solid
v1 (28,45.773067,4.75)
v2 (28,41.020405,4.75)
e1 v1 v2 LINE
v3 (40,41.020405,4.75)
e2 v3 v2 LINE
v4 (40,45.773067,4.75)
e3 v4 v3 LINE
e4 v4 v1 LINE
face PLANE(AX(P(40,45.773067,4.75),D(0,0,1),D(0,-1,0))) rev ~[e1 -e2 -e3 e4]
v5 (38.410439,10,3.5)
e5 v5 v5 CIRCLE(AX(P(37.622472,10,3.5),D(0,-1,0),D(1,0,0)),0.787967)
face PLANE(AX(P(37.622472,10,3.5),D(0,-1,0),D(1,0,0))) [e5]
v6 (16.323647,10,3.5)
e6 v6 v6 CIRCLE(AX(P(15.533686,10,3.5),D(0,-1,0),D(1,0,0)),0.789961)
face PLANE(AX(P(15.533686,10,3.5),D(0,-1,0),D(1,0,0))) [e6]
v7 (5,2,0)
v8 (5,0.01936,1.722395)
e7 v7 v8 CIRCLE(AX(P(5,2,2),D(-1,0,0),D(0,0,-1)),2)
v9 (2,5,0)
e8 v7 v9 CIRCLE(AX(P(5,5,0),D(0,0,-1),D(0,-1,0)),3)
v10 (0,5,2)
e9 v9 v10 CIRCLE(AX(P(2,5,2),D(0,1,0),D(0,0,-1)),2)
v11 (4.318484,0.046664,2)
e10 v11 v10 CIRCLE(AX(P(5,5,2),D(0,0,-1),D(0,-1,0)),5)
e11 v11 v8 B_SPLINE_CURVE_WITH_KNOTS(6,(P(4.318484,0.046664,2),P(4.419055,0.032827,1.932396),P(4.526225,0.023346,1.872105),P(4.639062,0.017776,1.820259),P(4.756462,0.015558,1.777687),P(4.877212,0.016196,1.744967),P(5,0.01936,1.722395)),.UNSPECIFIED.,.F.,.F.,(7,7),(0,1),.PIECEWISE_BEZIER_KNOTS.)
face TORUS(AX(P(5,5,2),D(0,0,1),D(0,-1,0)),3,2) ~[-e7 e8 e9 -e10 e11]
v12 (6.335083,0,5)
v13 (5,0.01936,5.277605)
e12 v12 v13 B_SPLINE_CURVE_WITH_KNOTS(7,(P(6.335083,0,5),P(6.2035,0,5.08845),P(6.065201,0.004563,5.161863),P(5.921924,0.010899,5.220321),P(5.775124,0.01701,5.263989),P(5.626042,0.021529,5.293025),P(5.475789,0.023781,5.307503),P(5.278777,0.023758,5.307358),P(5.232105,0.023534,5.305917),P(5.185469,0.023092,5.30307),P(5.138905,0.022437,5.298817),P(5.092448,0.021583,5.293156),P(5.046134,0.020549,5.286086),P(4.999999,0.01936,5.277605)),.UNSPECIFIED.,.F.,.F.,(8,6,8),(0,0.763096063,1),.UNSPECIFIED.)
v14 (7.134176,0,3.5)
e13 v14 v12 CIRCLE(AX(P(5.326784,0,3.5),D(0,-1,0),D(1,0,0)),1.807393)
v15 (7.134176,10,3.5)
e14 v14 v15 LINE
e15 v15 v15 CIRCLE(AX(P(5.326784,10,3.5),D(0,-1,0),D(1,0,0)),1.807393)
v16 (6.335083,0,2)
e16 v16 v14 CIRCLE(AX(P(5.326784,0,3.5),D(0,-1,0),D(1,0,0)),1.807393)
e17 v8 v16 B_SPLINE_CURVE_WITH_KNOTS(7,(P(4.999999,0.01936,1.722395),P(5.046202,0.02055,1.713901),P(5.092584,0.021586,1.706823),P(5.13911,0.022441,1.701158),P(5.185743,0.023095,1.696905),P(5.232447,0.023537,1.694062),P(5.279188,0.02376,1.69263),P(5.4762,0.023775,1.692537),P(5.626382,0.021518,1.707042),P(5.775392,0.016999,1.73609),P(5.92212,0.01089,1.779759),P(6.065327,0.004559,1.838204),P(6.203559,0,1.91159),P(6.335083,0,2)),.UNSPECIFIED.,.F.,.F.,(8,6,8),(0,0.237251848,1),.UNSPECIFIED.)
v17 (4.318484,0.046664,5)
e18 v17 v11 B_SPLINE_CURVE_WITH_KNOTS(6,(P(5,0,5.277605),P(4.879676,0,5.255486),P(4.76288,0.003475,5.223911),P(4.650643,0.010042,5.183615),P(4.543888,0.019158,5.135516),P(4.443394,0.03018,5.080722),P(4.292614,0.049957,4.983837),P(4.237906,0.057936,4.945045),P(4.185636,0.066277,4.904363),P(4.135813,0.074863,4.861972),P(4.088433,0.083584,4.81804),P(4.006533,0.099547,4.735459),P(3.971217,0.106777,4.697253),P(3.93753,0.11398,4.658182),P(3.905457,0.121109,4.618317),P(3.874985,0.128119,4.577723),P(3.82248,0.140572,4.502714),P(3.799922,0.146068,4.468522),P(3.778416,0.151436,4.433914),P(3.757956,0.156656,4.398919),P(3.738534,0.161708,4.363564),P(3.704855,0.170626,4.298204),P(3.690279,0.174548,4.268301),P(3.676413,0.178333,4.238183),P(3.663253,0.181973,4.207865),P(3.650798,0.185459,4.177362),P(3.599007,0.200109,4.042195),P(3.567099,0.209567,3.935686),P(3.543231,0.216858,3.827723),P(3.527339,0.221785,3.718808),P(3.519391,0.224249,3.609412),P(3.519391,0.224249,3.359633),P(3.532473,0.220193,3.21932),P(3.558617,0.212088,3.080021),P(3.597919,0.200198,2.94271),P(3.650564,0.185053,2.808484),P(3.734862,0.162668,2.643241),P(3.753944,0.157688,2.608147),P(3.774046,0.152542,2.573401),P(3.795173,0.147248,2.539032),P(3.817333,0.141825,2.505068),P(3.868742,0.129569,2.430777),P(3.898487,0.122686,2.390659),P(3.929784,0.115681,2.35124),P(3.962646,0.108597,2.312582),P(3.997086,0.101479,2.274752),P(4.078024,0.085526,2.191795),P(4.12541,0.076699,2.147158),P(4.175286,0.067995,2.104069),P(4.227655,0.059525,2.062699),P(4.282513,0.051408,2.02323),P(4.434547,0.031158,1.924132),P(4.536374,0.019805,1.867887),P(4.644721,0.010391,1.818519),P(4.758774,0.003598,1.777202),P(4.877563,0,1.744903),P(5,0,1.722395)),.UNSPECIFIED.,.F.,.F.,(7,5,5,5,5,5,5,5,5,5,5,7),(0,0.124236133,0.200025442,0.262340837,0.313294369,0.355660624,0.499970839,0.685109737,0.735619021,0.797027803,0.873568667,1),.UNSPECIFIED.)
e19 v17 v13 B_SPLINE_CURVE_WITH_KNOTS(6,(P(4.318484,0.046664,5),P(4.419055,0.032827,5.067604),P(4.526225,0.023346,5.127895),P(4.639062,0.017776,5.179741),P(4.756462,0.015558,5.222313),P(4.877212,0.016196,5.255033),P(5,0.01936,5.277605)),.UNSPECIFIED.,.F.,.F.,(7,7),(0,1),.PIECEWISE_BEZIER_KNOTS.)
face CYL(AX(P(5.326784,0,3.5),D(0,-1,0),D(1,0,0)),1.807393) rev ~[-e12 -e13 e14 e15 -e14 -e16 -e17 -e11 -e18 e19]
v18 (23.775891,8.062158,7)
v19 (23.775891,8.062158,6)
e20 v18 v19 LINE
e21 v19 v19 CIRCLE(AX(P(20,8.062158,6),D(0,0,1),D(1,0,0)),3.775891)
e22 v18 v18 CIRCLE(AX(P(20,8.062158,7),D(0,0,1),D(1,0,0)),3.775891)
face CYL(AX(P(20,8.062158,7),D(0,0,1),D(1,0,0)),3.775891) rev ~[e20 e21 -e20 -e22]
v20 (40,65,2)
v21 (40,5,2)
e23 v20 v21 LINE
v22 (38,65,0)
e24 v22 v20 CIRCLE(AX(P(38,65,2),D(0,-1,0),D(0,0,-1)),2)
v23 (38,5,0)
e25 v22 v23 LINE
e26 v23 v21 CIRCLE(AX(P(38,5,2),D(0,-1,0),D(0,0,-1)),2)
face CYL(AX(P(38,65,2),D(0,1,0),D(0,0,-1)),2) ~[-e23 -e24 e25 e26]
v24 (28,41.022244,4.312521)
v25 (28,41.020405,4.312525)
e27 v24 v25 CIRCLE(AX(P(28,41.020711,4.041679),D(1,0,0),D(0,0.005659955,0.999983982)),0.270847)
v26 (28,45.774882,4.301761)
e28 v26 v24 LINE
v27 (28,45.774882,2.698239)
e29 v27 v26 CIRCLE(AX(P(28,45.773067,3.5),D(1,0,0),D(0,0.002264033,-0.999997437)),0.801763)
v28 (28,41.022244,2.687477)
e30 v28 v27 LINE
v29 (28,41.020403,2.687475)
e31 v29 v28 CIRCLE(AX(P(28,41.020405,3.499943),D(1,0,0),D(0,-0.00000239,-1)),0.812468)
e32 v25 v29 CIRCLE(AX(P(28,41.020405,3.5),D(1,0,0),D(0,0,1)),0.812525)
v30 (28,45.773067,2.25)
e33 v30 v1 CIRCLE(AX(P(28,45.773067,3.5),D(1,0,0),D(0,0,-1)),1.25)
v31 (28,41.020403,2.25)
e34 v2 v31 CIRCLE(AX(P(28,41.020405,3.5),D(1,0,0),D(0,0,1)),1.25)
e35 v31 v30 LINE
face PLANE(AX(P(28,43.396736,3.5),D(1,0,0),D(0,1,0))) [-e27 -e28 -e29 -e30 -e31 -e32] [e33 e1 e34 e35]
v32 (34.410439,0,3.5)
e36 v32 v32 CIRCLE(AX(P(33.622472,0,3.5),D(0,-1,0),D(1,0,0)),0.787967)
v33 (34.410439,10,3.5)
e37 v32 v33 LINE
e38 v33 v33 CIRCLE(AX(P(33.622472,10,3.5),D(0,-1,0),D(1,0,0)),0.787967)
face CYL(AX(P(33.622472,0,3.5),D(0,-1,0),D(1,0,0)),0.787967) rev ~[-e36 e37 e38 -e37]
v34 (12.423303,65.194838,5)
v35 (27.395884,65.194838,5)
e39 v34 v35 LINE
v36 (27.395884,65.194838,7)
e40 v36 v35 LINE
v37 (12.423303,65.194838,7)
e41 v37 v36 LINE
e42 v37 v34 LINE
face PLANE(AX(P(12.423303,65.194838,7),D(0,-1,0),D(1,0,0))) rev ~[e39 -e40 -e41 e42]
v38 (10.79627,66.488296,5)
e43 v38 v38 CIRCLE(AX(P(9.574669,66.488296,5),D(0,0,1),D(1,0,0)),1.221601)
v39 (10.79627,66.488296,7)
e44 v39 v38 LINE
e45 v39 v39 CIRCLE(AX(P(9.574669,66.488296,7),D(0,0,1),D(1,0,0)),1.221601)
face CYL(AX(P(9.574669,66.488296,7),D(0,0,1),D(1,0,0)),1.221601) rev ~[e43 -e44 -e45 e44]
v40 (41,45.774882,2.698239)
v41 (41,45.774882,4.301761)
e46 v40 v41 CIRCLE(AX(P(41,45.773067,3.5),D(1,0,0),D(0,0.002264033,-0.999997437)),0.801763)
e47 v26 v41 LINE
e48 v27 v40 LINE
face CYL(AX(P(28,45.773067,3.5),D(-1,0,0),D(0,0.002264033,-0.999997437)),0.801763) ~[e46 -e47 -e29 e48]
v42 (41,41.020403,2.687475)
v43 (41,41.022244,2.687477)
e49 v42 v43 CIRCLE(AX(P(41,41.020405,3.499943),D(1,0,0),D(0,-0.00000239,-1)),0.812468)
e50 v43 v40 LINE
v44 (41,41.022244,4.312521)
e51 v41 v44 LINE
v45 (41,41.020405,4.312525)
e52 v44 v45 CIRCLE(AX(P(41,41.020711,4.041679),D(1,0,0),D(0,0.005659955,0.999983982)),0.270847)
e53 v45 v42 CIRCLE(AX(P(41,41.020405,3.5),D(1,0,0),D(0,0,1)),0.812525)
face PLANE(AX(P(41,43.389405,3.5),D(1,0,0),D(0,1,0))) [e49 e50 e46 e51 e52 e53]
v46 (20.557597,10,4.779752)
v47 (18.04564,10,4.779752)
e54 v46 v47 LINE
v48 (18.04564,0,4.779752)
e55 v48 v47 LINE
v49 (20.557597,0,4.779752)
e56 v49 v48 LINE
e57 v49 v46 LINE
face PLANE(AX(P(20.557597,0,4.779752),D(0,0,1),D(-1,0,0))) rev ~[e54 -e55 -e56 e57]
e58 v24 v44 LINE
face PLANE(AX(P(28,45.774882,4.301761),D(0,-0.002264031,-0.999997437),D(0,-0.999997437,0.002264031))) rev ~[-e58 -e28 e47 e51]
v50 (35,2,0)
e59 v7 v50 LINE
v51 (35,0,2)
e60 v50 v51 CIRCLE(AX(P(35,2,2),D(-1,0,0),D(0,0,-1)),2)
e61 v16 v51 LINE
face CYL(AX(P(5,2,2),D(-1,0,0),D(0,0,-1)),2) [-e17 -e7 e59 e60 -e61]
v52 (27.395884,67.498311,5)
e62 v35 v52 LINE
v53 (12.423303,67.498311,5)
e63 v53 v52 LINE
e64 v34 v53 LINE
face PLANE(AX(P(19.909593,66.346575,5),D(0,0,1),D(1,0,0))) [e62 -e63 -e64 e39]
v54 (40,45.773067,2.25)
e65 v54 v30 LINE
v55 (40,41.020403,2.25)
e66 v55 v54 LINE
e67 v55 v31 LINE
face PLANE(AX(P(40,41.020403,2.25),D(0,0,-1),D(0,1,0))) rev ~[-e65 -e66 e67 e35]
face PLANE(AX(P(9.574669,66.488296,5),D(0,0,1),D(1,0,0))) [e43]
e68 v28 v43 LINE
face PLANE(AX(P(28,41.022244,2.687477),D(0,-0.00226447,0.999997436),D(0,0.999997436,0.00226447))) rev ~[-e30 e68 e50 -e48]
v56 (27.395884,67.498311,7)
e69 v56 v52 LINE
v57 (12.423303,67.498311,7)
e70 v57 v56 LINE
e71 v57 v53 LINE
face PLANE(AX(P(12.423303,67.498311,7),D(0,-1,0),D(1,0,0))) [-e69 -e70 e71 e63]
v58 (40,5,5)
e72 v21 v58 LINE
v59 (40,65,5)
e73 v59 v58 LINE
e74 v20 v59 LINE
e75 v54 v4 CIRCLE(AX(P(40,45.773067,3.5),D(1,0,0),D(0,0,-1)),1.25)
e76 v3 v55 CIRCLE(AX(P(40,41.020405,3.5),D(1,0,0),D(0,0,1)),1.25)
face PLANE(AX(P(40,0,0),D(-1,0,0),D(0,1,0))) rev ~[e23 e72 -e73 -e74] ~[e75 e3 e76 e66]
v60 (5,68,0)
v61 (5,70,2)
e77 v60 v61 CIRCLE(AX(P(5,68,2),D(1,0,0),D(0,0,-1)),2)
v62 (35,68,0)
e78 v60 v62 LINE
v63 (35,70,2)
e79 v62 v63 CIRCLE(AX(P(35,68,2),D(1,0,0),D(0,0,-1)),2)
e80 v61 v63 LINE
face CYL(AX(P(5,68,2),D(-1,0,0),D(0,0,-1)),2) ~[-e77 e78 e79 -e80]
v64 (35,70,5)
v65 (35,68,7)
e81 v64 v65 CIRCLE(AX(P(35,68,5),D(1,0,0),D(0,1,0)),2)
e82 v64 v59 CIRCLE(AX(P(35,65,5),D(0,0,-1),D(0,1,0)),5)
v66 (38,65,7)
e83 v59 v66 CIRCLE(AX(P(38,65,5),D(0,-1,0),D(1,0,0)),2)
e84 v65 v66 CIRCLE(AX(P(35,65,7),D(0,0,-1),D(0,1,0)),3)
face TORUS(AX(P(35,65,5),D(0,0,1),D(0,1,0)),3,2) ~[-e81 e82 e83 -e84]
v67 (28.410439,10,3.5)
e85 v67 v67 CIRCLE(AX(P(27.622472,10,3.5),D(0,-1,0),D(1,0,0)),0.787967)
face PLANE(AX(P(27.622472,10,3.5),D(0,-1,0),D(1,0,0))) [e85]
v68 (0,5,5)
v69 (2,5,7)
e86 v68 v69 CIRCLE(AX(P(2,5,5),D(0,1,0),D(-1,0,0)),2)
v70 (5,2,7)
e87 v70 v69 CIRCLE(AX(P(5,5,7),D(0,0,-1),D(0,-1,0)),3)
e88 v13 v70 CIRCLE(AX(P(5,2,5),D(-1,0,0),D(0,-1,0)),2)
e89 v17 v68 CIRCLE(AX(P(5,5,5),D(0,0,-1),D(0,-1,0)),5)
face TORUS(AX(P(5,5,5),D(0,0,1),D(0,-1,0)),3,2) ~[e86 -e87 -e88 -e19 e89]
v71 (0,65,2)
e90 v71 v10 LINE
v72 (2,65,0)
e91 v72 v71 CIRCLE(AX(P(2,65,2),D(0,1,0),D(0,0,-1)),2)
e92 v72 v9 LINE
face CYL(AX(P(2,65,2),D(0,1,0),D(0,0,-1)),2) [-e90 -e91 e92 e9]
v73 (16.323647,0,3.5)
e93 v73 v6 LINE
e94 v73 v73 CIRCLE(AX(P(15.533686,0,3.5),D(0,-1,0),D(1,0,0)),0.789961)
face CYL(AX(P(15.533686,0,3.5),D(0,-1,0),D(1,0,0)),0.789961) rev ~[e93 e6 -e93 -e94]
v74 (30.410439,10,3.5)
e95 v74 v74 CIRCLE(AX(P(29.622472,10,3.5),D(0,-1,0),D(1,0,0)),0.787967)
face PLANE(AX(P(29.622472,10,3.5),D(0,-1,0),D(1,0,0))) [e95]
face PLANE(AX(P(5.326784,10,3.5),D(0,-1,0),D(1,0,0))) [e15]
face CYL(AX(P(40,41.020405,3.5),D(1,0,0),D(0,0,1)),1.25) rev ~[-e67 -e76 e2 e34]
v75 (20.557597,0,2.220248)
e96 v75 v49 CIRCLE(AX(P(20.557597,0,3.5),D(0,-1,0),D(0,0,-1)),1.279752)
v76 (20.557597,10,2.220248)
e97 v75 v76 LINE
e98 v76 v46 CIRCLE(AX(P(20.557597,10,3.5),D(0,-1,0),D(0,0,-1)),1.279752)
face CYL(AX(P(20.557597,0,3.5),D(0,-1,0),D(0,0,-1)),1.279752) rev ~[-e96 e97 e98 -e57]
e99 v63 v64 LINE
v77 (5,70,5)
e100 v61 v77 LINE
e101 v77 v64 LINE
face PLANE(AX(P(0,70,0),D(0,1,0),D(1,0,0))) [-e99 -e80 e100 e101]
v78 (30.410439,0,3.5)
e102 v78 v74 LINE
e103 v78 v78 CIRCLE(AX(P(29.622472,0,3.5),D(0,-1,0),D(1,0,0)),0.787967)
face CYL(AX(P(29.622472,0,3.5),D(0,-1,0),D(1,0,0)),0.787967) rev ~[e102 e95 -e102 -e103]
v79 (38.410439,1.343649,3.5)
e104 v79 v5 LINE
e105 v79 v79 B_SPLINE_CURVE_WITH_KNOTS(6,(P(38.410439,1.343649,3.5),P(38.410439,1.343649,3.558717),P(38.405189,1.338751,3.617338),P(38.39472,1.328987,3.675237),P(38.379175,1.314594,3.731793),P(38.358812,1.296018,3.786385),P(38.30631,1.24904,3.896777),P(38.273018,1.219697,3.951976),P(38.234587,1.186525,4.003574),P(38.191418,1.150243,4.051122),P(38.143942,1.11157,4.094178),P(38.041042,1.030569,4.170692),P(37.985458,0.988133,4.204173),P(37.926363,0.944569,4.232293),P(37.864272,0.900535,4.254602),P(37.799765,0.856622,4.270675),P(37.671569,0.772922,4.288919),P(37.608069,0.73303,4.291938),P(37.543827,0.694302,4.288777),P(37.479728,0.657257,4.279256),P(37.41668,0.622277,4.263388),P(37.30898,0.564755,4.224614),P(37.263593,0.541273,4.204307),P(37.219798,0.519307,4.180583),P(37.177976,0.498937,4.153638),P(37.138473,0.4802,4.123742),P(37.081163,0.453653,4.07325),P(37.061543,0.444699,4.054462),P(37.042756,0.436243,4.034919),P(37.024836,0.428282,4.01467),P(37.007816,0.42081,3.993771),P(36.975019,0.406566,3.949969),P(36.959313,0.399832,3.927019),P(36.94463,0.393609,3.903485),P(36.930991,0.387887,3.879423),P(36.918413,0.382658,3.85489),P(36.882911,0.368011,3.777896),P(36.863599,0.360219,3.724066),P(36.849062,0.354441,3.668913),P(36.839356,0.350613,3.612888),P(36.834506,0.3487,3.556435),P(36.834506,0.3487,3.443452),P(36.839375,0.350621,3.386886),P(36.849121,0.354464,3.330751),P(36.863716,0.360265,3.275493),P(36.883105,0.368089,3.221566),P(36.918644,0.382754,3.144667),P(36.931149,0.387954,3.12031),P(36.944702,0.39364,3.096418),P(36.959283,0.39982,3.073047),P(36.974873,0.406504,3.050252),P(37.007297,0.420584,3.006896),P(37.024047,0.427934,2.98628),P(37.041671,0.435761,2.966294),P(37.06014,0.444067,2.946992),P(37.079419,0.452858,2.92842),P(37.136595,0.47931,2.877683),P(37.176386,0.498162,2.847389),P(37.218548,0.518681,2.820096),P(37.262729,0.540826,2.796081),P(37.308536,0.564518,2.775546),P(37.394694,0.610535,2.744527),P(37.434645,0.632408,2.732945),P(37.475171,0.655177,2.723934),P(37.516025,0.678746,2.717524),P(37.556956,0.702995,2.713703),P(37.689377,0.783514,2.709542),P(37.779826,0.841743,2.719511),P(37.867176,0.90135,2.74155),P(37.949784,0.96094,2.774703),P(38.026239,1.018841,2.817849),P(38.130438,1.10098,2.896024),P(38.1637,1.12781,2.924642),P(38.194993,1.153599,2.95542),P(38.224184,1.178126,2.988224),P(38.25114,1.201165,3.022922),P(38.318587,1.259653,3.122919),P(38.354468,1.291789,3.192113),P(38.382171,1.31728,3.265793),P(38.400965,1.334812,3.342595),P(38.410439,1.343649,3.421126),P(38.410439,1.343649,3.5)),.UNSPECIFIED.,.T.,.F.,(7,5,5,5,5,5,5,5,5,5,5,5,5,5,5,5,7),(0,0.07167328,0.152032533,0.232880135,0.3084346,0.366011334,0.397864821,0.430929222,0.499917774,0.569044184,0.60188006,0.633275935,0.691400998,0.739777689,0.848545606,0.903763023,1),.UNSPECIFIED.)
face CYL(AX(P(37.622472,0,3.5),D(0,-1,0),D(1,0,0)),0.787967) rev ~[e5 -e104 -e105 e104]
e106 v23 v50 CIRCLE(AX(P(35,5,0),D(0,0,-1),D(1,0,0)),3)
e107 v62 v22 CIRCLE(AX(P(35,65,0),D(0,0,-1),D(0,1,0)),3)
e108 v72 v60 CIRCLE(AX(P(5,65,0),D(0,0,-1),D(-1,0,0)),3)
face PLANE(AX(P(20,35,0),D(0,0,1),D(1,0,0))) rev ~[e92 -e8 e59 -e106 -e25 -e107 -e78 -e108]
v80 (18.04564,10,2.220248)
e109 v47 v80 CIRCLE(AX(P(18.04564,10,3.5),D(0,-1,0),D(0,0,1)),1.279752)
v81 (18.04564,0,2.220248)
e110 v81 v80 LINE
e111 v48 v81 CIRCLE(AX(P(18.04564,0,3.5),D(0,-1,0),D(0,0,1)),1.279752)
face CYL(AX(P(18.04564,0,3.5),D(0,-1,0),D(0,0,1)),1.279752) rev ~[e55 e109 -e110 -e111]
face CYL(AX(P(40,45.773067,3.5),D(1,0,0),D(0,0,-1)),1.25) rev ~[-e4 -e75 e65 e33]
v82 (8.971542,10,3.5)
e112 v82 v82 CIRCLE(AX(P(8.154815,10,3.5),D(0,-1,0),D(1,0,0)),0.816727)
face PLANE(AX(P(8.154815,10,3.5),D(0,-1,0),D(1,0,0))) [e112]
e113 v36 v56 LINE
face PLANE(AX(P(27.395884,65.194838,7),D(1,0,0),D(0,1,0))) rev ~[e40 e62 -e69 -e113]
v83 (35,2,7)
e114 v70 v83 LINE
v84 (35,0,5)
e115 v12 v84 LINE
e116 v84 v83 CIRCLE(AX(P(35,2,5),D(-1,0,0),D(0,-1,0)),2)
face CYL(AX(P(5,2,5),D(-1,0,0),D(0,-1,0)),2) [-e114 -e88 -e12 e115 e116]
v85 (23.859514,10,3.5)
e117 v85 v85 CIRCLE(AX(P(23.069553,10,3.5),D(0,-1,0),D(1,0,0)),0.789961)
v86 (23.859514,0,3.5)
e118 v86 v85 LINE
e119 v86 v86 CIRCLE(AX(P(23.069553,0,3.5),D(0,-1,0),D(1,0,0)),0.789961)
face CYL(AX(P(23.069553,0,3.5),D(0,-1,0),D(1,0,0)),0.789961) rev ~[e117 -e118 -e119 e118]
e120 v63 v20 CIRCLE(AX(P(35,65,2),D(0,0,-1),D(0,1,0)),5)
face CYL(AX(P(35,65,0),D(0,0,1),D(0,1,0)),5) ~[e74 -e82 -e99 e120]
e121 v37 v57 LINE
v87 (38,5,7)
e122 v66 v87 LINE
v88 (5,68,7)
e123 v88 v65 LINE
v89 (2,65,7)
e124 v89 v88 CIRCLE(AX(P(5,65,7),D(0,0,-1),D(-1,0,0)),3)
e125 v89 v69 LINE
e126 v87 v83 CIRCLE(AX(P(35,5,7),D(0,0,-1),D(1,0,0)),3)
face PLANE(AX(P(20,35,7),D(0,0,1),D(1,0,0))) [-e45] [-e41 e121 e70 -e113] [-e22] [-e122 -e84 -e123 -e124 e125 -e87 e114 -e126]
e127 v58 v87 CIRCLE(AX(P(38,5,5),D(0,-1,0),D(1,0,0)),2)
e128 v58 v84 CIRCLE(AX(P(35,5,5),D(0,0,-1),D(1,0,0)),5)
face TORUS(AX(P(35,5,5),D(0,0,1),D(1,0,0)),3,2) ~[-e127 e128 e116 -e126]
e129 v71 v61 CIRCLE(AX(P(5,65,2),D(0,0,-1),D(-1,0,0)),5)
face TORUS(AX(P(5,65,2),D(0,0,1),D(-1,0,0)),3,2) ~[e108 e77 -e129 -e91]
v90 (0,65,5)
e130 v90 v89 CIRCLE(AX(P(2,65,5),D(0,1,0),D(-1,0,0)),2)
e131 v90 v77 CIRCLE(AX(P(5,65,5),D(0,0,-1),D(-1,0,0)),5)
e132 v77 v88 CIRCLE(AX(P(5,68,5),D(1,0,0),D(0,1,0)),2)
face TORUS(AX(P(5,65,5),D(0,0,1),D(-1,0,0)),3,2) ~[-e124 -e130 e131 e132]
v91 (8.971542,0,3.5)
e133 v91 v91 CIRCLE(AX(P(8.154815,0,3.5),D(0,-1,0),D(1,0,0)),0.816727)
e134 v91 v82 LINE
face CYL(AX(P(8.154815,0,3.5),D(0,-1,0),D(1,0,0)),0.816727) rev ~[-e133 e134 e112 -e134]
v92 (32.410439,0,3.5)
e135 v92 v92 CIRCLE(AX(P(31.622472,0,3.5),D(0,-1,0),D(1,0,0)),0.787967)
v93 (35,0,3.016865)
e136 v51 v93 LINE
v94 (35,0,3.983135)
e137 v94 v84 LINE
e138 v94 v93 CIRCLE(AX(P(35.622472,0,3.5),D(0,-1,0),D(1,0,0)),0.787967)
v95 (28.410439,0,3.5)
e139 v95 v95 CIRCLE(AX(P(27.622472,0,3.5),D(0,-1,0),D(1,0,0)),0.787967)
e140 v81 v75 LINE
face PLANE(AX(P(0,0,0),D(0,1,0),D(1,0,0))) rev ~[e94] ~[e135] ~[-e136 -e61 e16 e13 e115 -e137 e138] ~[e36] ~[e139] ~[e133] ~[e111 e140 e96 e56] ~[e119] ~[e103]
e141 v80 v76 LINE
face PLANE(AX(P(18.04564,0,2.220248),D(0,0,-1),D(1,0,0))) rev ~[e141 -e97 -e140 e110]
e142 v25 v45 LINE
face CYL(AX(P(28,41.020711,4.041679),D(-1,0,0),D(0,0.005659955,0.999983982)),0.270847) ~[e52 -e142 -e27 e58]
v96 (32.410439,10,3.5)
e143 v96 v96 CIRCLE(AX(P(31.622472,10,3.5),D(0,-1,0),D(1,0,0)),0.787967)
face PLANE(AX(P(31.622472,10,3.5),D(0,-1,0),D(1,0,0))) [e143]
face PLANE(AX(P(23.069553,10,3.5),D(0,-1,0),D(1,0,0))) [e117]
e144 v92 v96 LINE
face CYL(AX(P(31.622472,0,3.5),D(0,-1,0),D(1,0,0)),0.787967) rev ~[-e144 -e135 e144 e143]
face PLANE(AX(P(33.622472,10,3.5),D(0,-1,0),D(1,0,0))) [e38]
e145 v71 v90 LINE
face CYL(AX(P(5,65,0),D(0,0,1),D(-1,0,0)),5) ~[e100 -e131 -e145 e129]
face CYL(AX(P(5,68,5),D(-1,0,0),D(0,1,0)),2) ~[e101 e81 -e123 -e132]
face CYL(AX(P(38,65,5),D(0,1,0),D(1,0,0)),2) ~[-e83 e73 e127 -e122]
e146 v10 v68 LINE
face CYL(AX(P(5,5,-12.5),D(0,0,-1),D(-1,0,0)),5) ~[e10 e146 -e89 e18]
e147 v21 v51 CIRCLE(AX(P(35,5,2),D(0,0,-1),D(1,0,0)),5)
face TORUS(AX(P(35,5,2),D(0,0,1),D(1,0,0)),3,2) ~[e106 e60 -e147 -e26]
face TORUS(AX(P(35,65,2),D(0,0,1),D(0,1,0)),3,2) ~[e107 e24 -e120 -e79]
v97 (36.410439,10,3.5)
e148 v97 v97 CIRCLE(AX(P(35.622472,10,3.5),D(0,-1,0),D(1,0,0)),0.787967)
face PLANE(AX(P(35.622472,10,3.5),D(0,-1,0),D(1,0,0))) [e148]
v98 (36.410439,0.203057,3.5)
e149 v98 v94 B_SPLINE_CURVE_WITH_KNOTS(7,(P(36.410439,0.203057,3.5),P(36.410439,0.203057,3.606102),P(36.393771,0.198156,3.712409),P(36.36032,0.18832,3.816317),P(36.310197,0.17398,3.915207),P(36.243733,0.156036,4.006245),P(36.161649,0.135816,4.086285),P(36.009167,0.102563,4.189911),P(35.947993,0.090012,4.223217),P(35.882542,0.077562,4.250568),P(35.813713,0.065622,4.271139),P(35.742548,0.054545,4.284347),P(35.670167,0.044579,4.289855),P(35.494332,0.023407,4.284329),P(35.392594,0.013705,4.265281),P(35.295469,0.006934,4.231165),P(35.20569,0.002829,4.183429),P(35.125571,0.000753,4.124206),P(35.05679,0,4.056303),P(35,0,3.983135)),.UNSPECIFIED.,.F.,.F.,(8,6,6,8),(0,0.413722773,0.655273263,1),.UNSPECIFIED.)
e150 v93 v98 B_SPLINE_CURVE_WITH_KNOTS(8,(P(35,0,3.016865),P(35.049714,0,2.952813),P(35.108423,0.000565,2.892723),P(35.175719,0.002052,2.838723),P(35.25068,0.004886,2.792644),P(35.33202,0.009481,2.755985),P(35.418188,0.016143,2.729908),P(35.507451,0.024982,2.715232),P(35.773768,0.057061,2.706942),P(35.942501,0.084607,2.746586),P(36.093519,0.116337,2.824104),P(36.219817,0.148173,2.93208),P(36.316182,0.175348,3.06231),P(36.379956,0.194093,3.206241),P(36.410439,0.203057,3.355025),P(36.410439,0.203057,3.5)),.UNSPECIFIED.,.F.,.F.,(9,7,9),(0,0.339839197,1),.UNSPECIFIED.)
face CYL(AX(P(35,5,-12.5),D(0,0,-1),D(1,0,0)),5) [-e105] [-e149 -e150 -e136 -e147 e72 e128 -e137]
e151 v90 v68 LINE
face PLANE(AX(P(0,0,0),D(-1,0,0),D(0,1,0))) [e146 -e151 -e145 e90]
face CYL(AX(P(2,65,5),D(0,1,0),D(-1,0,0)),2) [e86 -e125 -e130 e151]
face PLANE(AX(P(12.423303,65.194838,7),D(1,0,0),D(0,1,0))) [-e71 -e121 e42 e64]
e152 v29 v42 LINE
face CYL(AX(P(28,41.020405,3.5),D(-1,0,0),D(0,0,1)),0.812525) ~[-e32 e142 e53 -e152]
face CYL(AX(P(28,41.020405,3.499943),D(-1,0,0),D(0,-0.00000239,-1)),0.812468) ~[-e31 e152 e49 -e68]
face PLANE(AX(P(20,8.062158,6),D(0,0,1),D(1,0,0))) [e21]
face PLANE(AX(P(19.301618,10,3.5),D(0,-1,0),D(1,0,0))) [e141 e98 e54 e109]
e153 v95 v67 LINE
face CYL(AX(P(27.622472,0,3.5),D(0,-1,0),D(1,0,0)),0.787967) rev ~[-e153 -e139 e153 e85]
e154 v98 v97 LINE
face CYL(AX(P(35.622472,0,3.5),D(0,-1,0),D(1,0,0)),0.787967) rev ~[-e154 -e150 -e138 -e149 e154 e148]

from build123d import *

# Parameters (mm, degrees)
F0_W          = 40
F0_H          = 70
F1_DEPTH      = 7
F2_R          = 0.7899610996
F2_R_2        = 0.7879667618
F2_R_3        = 1.8073925599
F2_R_4        = 0.8167266128
F3_DEPTH      = 10
F5_DEPTH      = 12
F7_DEPTH      = 13
F8_R          = 3.7758905803
F9_DEPTH      = 1
F10_W         = 14.9725805968
F10_H         = 2.3034736514
F10_R         = 1.22160092
F11_DEPTH     = 2
F12_T1_DEPTH  = 32
F13_R         = 5
F14_R         = 5
F15_T1_DEPTH  = 32
F16_T1_DEPTH  = 60
F16_T3_DEPTH  = 30
F16_T6_ANGLE  = 90
F16_T8_ANGLE  = 89.9999999974
F16_T10_ANGLE = 89.9999999974
F16_T12_ANGLE = 90
F17_T1_DEPTH  = 60
F17_T3_DEPTH  = 30
F17_T6_ANGLE  = 90
F17_T8_ANGLE  = 89.9999999974
F17_T10_ANGLE = 89.9999999974
F17_T12_ANGLE = 90


# Not quite as in the source:
# - a fillet or chamfer that OpenCascade refuses, or shapes differently, is made with other operations: its cross-section is extruded or revolved along the edge and cut away or added
# - ends of sketch curves that miss each other by under 0.0002 mm in the source are joined


with BuildPart() as f1:
    # F0 (on Top) → F1 (new body)
    with BuildSketch(Plane.XY):
        with Locations((20, 35)):
            Rectangle(F0_W, F0_H)
    extrude(amount=F1_DEPTH)

    # F2 (on face) → F3 (cut)
    with BuildSketch(Plane.XZ):
        with Locations((15.5336856842, 3.5)):
            Circle(F2_R)
        with BuildLine():
            Line((20.5575972795, 4.779751625), (18.0456396192, 4.779751625))
            ThreePointArc((18.0456396192, 4.779751625), (16.7658879943, 3.5), (18.0456396192, 2.220248375))
            Line((18.0456396192, 2.220248375), (20.5575972795, 2.220248375))
            ThreePointArc((20.5575972795, 2.220248375), (21.8373489045, 3.5), (20.5575972795, 4.779751625))
        make_face()
        with Locations((27.6224724948, 3.5)):
            Circle(F2_R_2)
        with Locations((23.0695530772, 3.5)):
            Circle(F2_R)
        with Locations((29.6224724948, 3.5)):
            Circle(F2_R_2)
        with Locations((31.6224724948, 3.5)):
            Circle(F2_R_2)
        with Locations((33.6224724948, 3.5)):
            Circle(F2_R_2)
        with Locations((35.6224724948, 3.5)):
            Circle(F2_R_2)
        with Locations((37.6224724948, 3.5)):
            Circle(F2_R_2)
        with Locations((5.3267837502, 3.5)):
            Circle(F2_R_3)
        with Locations((8.1548150629, 3.5)):
            Circle(F2_R_4)
    extrude(amount=-F3_DEPTH, mode=Mode.SUBTRACT)

    # F4 (on face) → F5 (cut)
    with BuildSketch(Plane.YZ.offset(40)):
        with BuildLine():
            Line((45.7730665803, 4.75), (41.0204045475, 4.75))
            ThreePointArc((41.0204045475, 4.75), (39.7704045475, 3.5000009306), (41.0204026863, 2.25))
            Line((41.0204026863, 2.25), (45.7730665803, 2.25))
            ThreePointArc((45.7730665803, 2.25), (47.0230665803, 3.5), (45.7730665803, 4.75))
        make_face()
    extrude(amount=-F5_DEPTH, mode=Mode.SUBTRACT)

    # F6 (on face) → F7 (join)
    with BuildSketch(Plane.YZ.offset(28)):
        with BuildLine():
            Line((45.7748817965, 4.3017610189), (41.022244125, 4.312521164))
            ThreePointArc((41.022244125, 4.312521164), (41.0213243392, 4.3125248082), (41.0204045475, 4.3125253288))
            ThreePointArc((41.0204045475, 4.3125253288), (40.2078792186, 3.5000009306), (41.0204026863, 2.6874746712))
            ThreePointArc((41.0204026863, 2.6874746712), (41.0213234086, 2.6874751907), (41.0222441297, 2.6874767536))
            Line((41.0222441297, 2.6874767536), (45.7748817965, 2.6982389853))
            ThreePointArc((45.7748817965, 2.6982389853), (46.5748296498, 3.5), (45.7748817965, 4.3017610189))
        make_face()
    extrude(amount=F7_DEPTH)

    # F8 (on face) → F9 (cut)
    with BuildSketch(Plane.XY.offset(7)):
        with Locations((20, 8.0621577799)):
            Circle(F8_R)
    extrude(amount=-F9_DEPTH, mode=Mode.SUBTRACT)

    # F10 (on face) → F11 (cut)
    with BuildSketch(Plane.XY.offset(7)):
        with Locations((19.9095932767, 66.3465745747)):
            Rectangle(F10_W, F10_H)
        with Locations((9.5746694133, 66.4882957935)):
            Circle(F10_R)
    extrude(amount=-F11_DEPTH, mode=Mode.SUBTRACT)

    # F12: fillet of radius 5 on 1 edges, made by hand

    # F12_s2 → F12_t1 (cut)
    with BuildSketch(Plane.XY.offset(-12.5)):
        with BuildLine():
            ThreePointArc((0, 5), (1.4644660941, 1.4644660941), (5, 0))
            Line((5, 0), (0, 0))
            Line((0, 0), (0, 5))
        make_face()
    extrude(amount=F12_T1_DEPTH, mode=Mode.SUBTRACT)

    # F13
    f13_edges = [f1.edges().sort_by_distance(p)[0] for p in [
        (0, 70, 3.5),
    ]]
    fillet(f13_edges, radius=F13_R)

    # F14
    f14_edges = [f1.edges().sort_by_distance(p)[0] for p in [
        (40, 70, 3.5),
    ]]
    fillet(f14_edges, radius=F14_R)

    # F15: fillet of radius 5 on 1 edges, made by hand

    # F15_s2 → F15_t1 (cut)
    with BuildSketch(Plane.XY.offset(-12.5)):
        with BuildLine():
            ThreePointArc((40, 5), (38.5355339059, 1.4644660941), (35, 0))
            Line((35, 0), (40, 0))
            Line((40, 0), (40, 5))
        make_face()
    extrude(amount=F15_T1_DEPTH, mode=Mode.SUBTRACT)

    # F16: fillet of radius 2 on 2 edges, made by hand

    # F16_s2 → F16_t1 (cut)
    with BuildSketch(Plane.XZ.offset(-65)):
        with BuildLine():
            ThreePointArc((40, 5), (39.4142135624, 6.4142135624), (38, 7))
            Line((38, 7), (40, 7))
            Line((40, 7), (40, 5))
        make_face()
        with BuildLine():
            ThreePointArc((0, 5), (0.5857864376, 6.4142135624), (2, 7))
            Line((2, 7), (0, 7))
            Line((0, 7), (0, 5))
        make_face()
    extrude(amount=F16_T1_DEPTH, mode=Mode.SUBTRACT)

    # F16_s4 → F16_t3 (cut)
    with BuildSketch(Plane.YZ.offset(5)):
        with BuildLine():
            ThreePointArc((0, 5), (0.5857864376, 6.4142135624), (2, 7))
            Line((2, 7), (0, 7))
            Line((0, 7), (0, 5))
        make_face()
        with BuildLine():
            ThreePointArc((70, 5), (69.4142135624, 6.4142135624), (68, 7))
            Line((68, 7), (70, 7))
            Line((70, 7), (70, 5))
        make_face()
    extrude(amount=F16_T3_DEPTH, mode=Mode.SUBTRACT)

    # F16_s5 → F16_t6 (revolve, cut)
    with BuildSketch(Plane.XZ.offset(-65)):
        with BuildLine():
            ThreePointArc((0, 5), (0.5857864376, 6.4142135624), (2, 7))
            Line((2, 7), (0, 7))
            Line((0, 7), (0, 5))
        make_face()
    revolve(axis=Axis((5, 65, 7), (0, 0, -1)), revolution_arc=F16_T6_ANGLE, mode=Mode.SUBTRACT)

    # F16_s7 → F16_t8 (revolve, cut)
    with BuildSketch(Plane.YZ.offset(5.0000000001)):
        with BuildLine():
            ThreePointArc((0, 5), (0.5857864376, 6.4142135624), (2, 7))
            Line((2, 7), (0, 7))
            Line((0, 7), (0, 5))
        make_face()
    revolve(axis=Axis((5.0000000001, 5.0000000001, 7), (0, 0, -1)), revolution_arc=F16_T8_ANGLE, mode=Mode.SUBTRACT)

    # F16_s9 → F16_t10 (revolve, cut)
    with BuildSketch(Plane.XZ.offset(-5.0000000001)):
        with BuildLine():
            ThreePointArc((40, 5), (39.4142135624, 6.4142135624), (38, 7))
            Line((38, 7), (40, 7))
            Line((40, 7), (40, 5))
        make_face()
    revolve(axis=Axis((34.9999999999, 5.0000000001, 7), (0, 0, -1)), revolution_arc=F16_T10_ANGLE, mode=Mode.SUBTRACT)

    # F16_s11 → F16_t12 (revolve, cut)
    with BuildSketch(Plane.YZ.offset(35)):
        with BuildLine():
            ThreePointArc((70, 5), (69.4142135624, 6.4142135624), (68, 7))
            Line((68, 7), (70, 7))
            Line((70, 7), (70, 5))
        make_face()
    revolve(axis=Axis((35, 65, 7), (0, 0, -1)), revolution_arc=F16_T12_ANGLE, mode=Mode.SUBTRACT)

    # F17: fillet of radius 2 on 8 edges, made by hand

    # F17_s2 → F17_t1 (cut)
    with BuildSketch(Plane.XZ.offset(-65)):
        with BuildLine():
            ThreePointArc((2, 0), (0.5857864376, 0.5857864376), (0, 2))
            Line((0, 2), (0, 0))
            Line((0, 0), (2, 0))
        make_face()
        with BuildLine():
            ThreePointArc((38, 0), (39.4142135624, 0.5857864376), (40, 2))
            Line((40, 2), (40, 0))
            Line((40, 0), (38, 0))
        make_face()
    extrude(amount=F17_T1_DEPTH, mode=Mode.SUBTRACT)

    # F17_s4 → F17_t3 (cut)
    with BuildSketch(Plane.YZ.offset(5)):
        with BuildLine():
            ThreePointArc((2, 0), (0.5857864376, 0.5857864376), (0, 2))
            Line((0, 2), (0, 0))
            Line((0, 0), (2, 0))
        make_face()
        with BuildLine():
            ThreePointArc((68, 0), (69.4142135624, 0.5857864376), (70, 2))
            Line((70, 2), (70, 0))
            Line((70, 0), (68, 0))
        make_face()
    extrude(amount=F17_T3_DEPTH, mode=Mode.SUBTRACT)

    # F17_s5 → F17_t6 (revolve, cut)
    with BuildSketch(Plane.YZ.offset(35)):
        with BuildLine():
            ThreePointArc((68, 0), (69.4142135624, 0.5857864376), (70, 2))
            Line((70, 2), (70, 0))
            Line((70, 0), (68, 0))
        make_face()
    revolve(axis=Axis((35, 65, 0), (0, 0, -1)), revolution_arc=F17_T6_ANGLE, mode=Mode.SUBTRACT)

    # F17_s7 → F17_t8 (revolve, cut)
    with BuildSketch(Plane.XZ.offset(-5.0000000001)):
        with BuildLine():
            ThreePointArc((38, 0), (39.4142135624, 0.5857864376), (40, 2))
            Line((40, 2), (40, 0))
            Line((40, 0), (38, 0))
        make_face()
    revolve(axis=Axis((34.9999999999, 5.0000000001, 0), (0, 0, -1)), revolution_arc=F17_T8_ANGLE, mode=Mode.SUBTRACT)

    # F17_s9 → F17_t10 (revolve, cut)
    with BuildSketch(Plane.YZ.offset(5.0000000001)):
        with BuildLine():
            ThreePointArc((2, 0), (0.5857864376, 0.5857864376), (0, 2))
            Line((0, 2), (0, 0))
            Line((0, 0), (2, 0))
        make_face()
    revolve(axis=Axis((5.0000000001, 5.0000000001, 0), (0, 0, -1)), revolution_arc=F17_T10_ANGLE, mode=Mode.SUBTRACT)

    # F17_s11 → F17_t12 (revolve, cut)
    with BuildSketch(Plane.XZ.offset(-65)):
        with BuildLine():
            ThreePointArc((2, 0), (0.5857864376, 0.5857864376), (0, 2))
            Line((0, 2), (0, 0))
            Line((0, 0), (2, 0))
        make_face()
    revolve(axis=Axis((5, 65, 0), (0, 0, -1)), revolution_arc=F17_T12_ANGLE, mode=Mode.SUBTRACT)


solid = f1.part
